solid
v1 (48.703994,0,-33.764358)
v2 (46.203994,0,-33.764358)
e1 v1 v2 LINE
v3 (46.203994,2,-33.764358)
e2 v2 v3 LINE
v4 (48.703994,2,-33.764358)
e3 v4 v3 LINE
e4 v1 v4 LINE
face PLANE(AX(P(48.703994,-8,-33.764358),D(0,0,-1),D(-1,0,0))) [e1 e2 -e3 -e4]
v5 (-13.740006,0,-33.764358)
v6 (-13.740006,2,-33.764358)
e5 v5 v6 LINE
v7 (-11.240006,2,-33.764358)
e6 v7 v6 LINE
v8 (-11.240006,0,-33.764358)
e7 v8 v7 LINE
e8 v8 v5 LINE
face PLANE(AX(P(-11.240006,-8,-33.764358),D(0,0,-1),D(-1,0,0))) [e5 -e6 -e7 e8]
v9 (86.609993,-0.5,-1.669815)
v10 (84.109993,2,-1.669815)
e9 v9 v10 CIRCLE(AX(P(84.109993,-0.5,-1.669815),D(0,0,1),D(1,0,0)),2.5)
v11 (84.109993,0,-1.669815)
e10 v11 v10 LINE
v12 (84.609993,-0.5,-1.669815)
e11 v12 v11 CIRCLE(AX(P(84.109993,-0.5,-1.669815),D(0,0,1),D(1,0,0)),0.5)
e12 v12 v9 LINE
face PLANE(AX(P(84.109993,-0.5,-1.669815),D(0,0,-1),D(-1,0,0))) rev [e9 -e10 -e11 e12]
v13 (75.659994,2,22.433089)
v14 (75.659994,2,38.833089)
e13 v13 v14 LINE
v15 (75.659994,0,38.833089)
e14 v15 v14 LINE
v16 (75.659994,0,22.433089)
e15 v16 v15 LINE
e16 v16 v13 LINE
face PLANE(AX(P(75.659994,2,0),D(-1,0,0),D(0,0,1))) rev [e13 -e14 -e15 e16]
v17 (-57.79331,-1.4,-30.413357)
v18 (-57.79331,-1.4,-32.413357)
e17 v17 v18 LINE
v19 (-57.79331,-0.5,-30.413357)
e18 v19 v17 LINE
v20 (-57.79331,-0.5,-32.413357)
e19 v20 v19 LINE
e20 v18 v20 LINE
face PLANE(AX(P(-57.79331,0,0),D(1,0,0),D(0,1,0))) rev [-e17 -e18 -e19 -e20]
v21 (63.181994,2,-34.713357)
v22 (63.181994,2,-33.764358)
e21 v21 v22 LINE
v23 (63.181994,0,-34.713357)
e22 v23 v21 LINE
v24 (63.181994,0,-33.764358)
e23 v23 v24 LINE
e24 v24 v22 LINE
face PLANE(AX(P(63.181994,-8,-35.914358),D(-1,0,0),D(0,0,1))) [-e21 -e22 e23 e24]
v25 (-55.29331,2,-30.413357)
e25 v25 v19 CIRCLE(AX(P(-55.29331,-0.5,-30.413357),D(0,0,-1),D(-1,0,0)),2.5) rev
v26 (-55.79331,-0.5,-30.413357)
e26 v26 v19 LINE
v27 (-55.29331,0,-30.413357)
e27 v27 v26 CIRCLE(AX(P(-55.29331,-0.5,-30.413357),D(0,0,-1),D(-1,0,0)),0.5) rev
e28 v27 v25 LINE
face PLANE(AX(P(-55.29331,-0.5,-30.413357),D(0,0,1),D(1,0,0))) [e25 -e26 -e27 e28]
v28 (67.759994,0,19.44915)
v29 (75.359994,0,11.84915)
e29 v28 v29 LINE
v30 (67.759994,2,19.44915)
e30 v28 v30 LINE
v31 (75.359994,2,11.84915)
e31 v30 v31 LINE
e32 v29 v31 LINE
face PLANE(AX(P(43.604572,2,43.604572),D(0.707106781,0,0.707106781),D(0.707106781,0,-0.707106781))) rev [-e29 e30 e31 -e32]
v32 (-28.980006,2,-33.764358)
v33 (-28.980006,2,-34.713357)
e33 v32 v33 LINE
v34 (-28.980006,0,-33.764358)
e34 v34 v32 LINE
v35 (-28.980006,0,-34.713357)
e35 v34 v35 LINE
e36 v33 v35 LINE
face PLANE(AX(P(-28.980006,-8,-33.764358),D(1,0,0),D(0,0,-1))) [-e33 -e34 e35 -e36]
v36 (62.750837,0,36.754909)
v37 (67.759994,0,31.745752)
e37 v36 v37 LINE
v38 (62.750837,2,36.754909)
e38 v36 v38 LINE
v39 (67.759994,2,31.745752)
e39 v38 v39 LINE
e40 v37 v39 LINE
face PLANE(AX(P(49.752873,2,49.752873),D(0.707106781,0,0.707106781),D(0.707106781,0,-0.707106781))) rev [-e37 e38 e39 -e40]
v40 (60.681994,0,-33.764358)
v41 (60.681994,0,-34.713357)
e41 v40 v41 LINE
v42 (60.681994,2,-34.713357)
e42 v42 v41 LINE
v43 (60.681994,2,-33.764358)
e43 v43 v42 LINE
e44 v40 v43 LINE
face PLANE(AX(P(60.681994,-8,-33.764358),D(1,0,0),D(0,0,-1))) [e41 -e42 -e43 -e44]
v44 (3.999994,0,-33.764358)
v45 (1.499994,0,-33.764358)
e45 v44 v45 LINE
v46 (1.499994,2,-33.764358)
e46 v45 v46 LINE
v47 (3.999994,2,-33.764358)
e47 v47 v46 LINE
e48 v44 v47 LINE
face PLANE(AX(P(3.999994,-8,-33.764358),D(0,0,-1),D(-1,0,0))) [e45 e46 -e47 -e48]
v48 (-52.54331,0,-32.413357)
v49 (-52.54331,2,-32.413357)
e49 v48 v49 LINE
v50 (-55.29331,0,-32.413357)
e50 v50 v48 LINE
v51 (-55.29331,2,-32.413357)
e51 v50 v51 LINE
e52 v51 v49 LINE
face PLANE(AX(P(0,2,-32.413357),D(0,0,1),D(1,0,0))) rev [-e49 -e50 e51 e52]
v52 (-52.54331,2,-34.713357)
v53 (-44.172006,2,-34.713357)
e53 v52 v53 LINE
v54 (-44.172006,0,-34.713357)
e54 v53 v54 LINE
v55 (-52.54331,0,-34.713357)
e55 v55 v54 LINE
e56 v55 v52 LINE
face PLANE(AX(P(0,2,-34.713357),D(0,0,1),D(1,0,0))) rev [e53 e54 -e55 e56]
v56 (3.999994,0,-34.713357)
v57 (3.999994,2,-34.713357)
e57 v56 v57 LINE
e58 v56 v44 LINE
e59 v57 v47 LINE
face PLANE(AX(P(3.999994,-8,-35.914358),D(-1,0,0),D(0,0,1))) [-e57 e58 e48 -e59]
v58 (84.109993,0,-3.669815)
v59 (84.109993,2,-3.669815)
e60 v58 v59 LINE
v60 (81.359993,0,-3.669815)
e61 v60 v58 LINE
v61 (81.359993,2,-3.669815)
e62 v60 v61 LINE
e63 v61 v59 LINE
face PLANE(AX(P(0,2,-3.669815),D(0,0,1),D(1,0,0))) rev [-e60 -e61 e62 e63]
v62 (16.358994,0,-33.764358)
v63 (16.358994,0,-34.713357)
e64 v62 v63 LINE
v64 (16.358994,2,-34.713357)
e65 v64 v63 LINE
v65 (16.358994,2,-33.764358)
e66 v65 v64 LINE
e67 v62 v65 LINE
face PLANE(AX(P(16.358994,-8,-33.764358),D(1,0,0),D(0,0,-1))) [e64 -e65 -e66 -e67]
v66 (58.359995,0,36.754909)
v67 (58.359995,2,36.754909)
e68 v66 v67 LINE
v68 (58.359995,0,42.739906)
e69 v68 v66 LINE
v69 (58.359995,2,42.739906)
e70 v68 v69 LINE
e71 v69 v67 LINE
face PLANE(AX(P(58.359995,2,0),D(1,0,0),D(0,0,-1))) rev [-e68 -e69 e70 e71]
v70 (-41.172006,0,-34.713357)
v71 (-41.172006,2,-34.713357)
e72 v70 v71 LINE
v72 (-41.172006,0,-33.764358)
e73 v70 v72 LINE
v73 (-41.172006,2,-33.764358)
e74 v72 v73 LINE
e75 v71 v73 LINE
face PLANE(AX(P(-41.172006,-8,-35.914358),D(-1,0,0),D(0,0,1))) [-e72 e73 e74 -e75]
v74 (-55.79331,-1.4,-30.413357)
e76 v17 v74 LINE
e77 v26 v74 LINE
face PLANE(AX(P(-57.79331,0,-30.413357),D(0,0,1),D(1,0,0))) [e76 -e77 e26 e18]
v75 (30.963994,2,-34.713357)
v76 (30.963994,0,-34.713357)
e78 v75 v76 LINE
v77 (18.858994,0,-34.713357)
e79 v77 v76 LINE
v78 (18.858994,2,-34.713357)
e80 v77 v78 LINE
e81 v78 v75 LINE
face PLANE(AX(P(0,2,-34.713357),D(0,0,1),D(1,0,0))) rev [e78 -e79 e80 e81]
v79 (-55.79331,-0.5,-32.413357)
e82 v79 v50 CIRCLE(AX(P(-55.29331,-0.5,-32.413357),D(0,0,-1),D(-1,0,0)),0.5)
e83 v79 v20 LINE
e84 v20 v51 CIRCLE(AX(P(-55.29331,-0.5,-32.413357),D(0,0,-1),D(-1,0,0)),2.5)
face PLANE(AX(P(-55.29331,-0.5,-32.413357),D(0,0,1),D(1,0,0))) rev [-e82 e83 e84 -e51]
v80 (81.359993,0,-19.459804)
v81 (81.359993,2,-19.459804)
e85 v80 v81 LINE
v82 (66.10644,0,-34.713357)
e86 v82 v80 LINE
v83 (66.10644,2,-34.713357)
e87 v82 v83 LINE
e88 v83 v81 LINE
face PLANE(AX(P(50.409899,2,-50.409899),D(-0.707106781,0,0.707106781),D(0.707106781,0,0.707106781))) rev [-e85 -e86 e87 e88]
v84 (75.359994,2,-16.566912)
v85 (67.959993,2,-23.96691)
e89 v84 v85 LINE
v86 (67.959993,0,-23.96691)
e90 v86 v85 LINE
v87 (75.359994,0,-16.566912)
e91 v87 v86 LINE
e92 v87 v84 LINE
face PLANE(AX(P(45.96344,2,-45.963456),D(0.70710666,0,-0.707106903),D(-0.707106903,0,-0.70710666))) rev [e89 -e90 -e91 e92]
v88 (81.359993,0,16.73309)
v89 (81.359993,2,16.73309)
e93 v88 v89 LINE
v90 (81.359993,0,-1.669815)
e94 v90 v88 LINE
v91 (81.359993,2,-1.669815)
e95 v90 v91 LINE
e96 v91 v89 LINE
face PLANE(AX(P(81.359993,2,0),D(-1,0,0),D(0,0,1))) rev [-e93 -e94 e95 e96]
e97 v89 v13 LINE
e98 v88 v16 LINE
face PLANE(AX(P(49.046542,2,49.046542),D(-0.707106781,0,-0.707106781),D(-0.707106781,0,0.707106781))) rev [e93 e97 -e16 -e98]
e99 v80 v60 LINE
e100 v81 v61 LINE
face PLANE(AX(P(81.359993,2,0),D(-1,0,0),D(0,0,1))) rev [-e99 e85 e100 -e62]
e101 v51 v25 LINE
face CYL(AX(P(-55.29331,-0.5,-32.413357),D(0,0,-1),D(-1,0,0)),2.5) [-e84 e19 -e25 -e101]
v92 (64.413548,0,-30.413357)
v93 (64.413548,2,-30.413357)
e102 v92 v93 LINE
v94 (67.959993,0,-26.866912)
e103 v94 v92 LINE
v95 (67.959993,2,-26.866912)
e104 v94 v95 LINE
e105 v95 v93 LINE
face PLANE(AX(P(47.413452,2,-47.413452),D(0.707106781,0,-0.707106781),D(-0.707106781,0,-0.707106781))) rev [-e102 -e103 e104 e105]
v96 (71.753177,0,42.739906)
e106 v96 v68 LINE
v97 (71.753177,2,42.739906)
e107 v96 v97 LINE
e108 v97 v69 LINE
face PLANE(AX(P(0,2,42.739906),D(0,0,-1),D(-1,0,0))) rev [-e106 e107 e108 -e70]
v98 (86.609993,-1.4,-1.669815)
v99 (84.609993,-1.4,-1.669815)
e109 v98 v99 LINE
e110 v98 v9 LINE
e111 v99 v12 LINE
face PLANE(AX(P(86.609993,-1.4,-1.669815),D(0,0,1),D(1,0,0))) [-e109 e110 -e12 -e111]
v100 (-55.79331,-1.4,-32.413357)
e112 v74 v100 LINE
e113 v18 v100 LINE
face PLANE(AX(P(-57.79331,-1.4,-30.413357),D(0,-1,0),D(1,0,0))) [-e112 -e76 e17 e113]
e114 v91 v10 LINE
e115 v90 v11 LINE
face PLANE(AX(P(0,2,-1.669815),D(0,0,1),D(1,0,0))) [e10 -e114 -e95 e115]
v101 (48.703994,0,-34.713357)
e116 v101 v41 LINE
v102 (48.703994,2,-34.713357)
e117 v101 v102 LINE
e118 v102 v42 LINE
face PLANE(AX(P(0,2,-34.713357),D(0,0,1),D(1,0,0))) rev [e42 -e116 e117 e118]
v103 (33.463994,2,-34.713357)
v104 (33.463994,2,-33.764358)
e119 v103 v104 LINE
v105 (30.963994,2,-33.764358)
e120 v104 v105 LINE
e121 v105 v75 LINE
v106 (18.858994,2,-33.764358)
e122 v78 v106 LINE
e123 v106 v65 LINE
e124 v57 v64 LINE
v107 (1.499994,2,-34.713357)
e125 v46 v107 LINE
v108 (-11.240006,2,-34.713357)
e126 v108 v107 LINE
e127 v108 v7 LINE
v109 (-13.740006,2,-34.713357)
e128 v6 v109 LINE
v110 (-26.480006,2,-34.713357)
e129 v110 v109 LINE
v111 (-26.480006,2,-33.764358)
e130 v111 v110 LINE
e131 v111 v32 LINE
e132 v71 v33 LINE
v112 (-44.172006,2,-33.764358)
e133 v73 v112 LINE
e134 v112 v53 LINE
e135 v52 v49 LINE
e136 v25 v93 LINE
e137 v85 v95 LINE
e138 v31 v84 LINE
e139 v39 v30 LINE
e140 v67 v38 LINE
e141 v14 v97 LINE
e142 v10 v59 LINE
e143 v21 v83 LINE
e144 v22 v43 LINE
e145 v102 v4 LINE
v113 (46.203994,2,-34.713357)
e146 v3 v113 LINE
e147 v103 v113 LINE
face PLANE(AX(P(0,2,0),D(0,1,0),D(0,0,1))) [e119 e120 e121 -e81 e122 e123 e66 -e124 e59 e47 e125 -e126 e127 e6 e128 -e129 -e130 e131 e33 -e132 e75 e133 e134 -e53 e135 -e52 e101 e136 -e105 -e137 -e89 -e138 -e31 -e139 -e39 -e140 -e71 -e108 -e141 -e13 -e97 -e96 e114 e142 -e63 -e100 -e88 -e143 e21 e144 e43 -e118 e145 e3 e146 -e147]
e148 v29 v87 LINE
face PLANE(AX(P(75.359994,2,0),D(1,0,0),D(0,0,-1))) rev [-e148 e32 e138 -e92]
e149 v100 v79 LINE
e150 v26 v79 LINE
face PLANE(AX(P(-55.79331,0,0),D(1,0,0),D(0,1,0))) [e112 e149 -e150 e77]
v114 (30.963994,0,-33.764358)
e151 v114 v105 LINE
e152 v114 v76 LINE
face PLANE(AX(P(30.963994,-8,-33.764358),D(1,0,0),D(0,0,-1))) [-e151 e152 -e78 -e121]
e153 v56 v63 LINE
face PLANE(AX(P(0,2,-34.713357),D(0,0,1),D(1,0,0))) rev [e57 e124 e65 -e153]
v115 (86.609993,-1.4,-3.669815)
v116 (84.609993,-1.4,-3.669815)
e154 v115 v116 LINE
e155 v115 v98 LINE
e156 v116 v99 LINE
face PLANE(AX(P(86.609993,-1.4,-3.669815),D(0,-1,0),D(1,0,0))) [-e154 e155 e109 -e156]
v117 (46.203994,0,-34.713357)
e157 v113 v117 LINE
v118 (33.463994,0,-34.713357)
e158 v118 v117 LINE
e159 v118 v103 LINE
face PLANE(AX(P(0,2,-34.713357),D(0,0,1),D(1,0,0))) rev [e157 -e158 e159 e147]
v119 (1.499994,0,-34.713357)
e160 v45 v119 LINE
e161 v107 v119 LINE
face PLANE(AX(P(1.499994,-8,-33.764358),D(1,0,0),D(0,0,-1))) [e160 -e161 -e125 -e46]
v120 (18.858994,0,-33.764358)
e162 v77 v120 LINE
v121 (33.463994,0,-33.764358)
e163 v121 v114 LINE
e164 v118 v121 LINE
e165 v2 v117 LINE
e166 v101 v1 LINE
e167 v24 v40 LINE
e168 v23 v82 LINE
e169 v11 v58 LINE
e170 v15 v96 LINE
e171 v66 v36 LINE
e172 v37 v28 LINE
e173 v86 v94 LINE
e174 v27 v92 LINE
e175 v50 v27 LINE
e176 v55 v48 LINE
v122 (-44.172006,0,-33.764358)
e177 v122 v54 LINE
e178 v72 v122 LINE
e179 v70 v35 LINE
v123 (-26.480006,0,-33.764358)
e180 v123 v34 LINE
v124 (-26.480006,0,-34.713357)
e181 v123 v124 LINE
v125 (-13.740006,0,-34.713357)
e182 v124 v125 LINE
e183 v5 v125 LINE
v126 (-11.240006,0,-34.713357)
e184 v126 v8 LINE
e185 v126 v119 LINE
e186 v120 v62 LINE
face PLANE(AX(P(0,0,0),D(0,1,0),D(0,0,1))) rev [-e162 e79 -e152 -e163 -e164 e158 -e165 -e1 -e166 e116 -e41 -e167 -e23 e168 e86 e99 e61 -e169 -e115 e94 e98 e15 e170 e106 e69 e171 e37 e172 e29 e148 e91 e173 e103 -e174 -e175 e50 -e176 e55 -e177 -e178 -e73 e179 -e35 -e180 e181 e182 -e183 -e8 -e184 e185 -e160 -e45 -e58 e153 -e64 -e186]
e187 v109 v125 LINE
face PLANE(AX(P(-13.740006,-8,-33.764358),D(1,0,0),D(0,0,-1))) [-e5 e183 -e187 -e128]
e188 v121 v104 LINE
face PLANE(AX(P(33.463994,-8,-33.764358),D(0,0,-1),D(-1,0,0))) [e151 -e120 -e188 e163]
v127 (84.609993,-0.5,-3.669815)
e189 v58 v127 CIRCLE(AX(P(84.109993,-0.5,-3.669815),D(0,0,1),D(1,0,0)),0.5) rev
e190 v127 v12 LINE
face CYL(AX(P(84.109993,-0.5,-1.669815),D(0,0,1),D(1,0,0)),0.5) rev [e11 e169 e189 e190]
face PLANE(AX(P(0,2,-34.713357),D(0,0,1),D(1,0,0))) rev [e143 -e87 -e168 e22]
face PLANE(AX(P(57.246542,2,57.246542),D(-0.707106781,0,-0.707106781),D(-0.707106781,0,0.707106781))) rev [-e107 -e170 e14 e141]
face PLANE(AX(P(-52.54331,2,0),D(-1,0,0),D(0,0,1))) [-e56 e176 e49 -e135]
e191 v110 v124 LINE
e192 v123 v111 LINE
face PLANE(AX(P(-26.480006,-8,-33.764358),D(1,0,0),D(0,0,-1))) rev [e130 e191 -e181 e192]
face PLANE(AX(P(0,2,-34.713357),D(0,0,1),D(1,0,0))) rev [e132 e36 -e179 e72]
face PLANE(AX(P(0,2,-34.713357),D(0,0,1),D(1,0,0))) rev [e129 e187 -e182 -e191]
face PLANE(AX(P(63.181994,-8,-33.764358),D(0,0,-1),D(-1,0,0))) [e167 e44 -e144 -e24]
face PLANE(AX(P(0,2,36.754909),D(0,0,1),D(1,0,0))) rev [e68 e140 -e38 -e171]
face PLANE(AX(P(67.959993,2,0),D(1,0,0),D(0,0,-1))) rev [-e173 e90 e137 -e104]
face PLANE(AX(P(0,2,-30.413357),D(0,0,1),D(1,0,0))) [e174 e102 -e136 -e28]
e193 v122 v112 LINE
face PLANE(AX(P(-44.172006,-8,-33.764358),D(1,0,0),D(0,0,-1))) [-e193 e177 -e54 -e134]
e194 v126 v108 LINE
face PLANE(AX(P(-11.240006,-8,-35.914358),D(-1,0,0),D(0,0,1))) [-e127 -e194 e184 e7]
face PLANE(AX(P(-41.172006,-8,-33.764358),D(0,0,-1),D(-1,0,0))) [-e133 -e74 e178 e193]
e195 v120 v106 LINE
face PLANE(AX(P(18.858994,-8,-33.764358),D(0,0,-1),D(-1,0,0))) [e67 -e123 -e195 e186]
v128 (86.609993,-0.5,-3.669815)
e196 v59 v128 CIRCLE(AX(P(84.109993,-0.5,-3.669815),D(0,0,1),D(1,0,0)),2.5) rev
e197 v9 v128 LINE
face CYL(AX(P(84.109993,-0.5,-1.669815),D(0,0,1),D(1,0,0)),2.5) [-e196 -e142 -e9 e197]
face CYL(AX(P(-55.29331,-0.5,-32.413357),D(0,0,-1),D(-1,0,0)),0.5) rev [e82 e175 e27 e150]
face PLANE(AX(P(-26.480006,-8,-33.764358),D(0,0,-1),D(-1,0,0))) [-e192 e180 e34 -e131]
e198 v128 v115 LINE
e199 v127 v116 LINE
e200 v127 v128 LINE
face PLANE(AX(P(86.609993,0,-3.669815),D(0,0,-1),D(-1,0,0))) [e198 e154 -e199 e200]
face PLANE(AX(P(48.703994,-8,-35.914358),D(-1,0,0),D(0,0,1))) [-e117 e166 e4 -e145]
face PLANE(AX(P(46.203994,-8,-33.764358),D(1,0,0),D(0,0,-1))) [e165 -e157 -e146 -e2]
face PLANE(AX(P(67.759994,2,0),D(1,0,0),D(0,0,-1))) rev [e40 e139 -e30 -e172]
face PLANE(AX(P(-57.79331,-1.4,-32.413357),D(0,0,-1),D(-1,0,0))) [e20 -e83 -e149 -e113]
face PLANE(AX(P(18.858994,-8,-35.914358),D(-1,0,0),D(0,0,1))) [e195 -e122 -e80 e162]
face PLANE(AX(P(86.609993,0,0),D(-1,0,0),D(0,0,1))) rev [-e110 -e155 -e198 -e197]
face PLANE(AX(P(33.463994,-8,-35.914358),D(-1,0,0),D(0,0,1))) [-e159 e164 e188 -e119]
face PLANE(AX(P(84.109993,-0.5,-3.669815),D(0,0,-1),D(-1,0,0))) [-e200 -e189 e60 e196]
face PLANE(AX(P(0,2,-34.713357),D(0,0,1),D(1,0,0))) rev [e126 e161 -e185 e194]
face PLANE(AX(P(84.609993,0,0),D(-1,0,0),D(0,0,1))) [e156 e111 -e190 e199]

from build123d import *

# Parameters (mm, degrees)
BOSS_EXTRUDE1_DEPTH = 2
EDGE_FLANGE1_DEPTH  = 2
EDGE_FLANGE2_DEPTH  = 2
SKETCH13_W          = 2.5
SKETCH13_H          = 2.15
SKETCH13_W_2        = 3
CUT_EXTRUDE3_DEPTH  = 10


# Sheet-metal steps are written as plain solids
with BuildPart() as part:
    # Sketch2 → Boss-Extrude1 (new body)
    with BuildSketch(Plane(origin=(0, 0, 0), x_dir=(1, 0, 0), z_dir=(0, 1, 0))):
        Polygon((-52.543309772, 32.413356753), (-54.793309772, 32.413356753), (-54.793309772, 30.413356753), (64.413548219, 30.413356753), (67.959993108, 26.866911863), (67.959993108, 23.966910068), (75.359993548, 16.566912168), (75.359993548, -11.849150158), (67.759993508, -19.449150198), (67.759993508, -31.745752353), (62.750836838, -36.754909023), (58.359994528, -36.754909023), (58.359994528, -42.739906444), (71.753176861, -42.739906444), (75.659994488, -38.833088817), (75.659994488, -22.433088597), (81.359993248, -16.733089837), (81.359993248, 1.669814581), (83.609993248, 1.669814581), (83.609993248, 3.669814581), (81.359993248, 3.669814581), (81.359993248, 19.459804242), (66.106440177, 34.713357313), (-52.543309772, 34.713357313), align=None)
    extrude(amount=BOSS_EXTRUDE1_DEPTH)

    # Edge-Flange1 section (across the edge) → Edge-Flange1 (add)
    with BuildSketch(Plane(origin=(-55.793309772, 0, -30.413356753), x_dir=(1, 0, 0), z_dir=(0, 0, -1))):
        with BuildLine():
            Line((-2, 0.5), (-2, 1.4))
            Line((-2, 1.4), (0, 1.4))
            Line((0, 1.4), (0, 0.5))
            ThreePointArc((0, 0.5), (0.146446609, 0.146446609), (0.5, 0))
            Line((0.5, 0), (1, 0))
            Line((1, 0), (1, -2))
            Line((1, -2), (0.5, -2))
            ThreePointArc((0.5, -2), (-1.267766953, -1.267766953), (-2, 0.5))
        make_face()
    extrude(amount=EDGE_FLANGE1_DEPTH)

    # Edge-Flange2 section (across the edge) → Edge-Flange2 (add)
    with BuildSketch(Plane(origin=(84.609993248, 0, -3.669814581), x_dir=(-1, 0, 0), z_dir=(0, 0, 1))):
        with BuildLine():
            Line((-2, 0.5), (-2, 1.4))
            Line((-2, 1.4), (0, 1.4))
            Line((0, 1.4), (0, 0.5))
            ThreePointArc((0, 0.5), (0.146446609, 0.146446609), (0.5, 0))
            Line((0.5, 0), (1, 0))
            Line((1, 0), (1, -2))
            Line((1, -2), (0.5, -2))
            ThreePointArc((0.5, -2), (-1.267766953, -1.267766953), (-2, 0.5))
        make_face()
    extrude(amount=EDGE_FLANGE2_DEPTH)

    # Sketch13 → Cut-Extrude3 (cut)
    with BuildSketch(Plane(origin=(0, 2, 0), x_dir=(1, 0, 0), z_dir=(0, 1, 0))):
        with Locations((-27.730006168, 34.839358373)):
            Rectangle(SKETCH13_W, SKETCH13_H)
        with Locations((-42.672006168, 34.839358373)):
            Rectangle(SKETCH13_W_2, SKETCH13_H)
        with Locations((-12.490006168, 34.839358373)):
            Rectangle(SKETCH13_W, SKETCH13_H)
        with Locations((2.749993832, 34.839358373)):
            Rectangle(SKETCH13_W, SKETCH13_H)
        with Locations((17.608993832, 34.839358373)):
            Rectangle(SKETCH13_W, SKETCH13_H)
        with Locations((32.213993832, 34.839358373)):
            Rectangle(SKETCH13_W, SKETCH13_H)
        with Locations((47.453993832, 34.839358373)):
            Rectangle(SKETCH13_W, SKETCH13_H)
        with Locations((61.931993832, 34.839358373)):
            Rectangle(SKETCH13_W, SKETCH13_H)
    extrude(amount=-CUT_EXTRUDE3_DEPTH, mode=Mode.SUBTRACT)


solid = part.part
